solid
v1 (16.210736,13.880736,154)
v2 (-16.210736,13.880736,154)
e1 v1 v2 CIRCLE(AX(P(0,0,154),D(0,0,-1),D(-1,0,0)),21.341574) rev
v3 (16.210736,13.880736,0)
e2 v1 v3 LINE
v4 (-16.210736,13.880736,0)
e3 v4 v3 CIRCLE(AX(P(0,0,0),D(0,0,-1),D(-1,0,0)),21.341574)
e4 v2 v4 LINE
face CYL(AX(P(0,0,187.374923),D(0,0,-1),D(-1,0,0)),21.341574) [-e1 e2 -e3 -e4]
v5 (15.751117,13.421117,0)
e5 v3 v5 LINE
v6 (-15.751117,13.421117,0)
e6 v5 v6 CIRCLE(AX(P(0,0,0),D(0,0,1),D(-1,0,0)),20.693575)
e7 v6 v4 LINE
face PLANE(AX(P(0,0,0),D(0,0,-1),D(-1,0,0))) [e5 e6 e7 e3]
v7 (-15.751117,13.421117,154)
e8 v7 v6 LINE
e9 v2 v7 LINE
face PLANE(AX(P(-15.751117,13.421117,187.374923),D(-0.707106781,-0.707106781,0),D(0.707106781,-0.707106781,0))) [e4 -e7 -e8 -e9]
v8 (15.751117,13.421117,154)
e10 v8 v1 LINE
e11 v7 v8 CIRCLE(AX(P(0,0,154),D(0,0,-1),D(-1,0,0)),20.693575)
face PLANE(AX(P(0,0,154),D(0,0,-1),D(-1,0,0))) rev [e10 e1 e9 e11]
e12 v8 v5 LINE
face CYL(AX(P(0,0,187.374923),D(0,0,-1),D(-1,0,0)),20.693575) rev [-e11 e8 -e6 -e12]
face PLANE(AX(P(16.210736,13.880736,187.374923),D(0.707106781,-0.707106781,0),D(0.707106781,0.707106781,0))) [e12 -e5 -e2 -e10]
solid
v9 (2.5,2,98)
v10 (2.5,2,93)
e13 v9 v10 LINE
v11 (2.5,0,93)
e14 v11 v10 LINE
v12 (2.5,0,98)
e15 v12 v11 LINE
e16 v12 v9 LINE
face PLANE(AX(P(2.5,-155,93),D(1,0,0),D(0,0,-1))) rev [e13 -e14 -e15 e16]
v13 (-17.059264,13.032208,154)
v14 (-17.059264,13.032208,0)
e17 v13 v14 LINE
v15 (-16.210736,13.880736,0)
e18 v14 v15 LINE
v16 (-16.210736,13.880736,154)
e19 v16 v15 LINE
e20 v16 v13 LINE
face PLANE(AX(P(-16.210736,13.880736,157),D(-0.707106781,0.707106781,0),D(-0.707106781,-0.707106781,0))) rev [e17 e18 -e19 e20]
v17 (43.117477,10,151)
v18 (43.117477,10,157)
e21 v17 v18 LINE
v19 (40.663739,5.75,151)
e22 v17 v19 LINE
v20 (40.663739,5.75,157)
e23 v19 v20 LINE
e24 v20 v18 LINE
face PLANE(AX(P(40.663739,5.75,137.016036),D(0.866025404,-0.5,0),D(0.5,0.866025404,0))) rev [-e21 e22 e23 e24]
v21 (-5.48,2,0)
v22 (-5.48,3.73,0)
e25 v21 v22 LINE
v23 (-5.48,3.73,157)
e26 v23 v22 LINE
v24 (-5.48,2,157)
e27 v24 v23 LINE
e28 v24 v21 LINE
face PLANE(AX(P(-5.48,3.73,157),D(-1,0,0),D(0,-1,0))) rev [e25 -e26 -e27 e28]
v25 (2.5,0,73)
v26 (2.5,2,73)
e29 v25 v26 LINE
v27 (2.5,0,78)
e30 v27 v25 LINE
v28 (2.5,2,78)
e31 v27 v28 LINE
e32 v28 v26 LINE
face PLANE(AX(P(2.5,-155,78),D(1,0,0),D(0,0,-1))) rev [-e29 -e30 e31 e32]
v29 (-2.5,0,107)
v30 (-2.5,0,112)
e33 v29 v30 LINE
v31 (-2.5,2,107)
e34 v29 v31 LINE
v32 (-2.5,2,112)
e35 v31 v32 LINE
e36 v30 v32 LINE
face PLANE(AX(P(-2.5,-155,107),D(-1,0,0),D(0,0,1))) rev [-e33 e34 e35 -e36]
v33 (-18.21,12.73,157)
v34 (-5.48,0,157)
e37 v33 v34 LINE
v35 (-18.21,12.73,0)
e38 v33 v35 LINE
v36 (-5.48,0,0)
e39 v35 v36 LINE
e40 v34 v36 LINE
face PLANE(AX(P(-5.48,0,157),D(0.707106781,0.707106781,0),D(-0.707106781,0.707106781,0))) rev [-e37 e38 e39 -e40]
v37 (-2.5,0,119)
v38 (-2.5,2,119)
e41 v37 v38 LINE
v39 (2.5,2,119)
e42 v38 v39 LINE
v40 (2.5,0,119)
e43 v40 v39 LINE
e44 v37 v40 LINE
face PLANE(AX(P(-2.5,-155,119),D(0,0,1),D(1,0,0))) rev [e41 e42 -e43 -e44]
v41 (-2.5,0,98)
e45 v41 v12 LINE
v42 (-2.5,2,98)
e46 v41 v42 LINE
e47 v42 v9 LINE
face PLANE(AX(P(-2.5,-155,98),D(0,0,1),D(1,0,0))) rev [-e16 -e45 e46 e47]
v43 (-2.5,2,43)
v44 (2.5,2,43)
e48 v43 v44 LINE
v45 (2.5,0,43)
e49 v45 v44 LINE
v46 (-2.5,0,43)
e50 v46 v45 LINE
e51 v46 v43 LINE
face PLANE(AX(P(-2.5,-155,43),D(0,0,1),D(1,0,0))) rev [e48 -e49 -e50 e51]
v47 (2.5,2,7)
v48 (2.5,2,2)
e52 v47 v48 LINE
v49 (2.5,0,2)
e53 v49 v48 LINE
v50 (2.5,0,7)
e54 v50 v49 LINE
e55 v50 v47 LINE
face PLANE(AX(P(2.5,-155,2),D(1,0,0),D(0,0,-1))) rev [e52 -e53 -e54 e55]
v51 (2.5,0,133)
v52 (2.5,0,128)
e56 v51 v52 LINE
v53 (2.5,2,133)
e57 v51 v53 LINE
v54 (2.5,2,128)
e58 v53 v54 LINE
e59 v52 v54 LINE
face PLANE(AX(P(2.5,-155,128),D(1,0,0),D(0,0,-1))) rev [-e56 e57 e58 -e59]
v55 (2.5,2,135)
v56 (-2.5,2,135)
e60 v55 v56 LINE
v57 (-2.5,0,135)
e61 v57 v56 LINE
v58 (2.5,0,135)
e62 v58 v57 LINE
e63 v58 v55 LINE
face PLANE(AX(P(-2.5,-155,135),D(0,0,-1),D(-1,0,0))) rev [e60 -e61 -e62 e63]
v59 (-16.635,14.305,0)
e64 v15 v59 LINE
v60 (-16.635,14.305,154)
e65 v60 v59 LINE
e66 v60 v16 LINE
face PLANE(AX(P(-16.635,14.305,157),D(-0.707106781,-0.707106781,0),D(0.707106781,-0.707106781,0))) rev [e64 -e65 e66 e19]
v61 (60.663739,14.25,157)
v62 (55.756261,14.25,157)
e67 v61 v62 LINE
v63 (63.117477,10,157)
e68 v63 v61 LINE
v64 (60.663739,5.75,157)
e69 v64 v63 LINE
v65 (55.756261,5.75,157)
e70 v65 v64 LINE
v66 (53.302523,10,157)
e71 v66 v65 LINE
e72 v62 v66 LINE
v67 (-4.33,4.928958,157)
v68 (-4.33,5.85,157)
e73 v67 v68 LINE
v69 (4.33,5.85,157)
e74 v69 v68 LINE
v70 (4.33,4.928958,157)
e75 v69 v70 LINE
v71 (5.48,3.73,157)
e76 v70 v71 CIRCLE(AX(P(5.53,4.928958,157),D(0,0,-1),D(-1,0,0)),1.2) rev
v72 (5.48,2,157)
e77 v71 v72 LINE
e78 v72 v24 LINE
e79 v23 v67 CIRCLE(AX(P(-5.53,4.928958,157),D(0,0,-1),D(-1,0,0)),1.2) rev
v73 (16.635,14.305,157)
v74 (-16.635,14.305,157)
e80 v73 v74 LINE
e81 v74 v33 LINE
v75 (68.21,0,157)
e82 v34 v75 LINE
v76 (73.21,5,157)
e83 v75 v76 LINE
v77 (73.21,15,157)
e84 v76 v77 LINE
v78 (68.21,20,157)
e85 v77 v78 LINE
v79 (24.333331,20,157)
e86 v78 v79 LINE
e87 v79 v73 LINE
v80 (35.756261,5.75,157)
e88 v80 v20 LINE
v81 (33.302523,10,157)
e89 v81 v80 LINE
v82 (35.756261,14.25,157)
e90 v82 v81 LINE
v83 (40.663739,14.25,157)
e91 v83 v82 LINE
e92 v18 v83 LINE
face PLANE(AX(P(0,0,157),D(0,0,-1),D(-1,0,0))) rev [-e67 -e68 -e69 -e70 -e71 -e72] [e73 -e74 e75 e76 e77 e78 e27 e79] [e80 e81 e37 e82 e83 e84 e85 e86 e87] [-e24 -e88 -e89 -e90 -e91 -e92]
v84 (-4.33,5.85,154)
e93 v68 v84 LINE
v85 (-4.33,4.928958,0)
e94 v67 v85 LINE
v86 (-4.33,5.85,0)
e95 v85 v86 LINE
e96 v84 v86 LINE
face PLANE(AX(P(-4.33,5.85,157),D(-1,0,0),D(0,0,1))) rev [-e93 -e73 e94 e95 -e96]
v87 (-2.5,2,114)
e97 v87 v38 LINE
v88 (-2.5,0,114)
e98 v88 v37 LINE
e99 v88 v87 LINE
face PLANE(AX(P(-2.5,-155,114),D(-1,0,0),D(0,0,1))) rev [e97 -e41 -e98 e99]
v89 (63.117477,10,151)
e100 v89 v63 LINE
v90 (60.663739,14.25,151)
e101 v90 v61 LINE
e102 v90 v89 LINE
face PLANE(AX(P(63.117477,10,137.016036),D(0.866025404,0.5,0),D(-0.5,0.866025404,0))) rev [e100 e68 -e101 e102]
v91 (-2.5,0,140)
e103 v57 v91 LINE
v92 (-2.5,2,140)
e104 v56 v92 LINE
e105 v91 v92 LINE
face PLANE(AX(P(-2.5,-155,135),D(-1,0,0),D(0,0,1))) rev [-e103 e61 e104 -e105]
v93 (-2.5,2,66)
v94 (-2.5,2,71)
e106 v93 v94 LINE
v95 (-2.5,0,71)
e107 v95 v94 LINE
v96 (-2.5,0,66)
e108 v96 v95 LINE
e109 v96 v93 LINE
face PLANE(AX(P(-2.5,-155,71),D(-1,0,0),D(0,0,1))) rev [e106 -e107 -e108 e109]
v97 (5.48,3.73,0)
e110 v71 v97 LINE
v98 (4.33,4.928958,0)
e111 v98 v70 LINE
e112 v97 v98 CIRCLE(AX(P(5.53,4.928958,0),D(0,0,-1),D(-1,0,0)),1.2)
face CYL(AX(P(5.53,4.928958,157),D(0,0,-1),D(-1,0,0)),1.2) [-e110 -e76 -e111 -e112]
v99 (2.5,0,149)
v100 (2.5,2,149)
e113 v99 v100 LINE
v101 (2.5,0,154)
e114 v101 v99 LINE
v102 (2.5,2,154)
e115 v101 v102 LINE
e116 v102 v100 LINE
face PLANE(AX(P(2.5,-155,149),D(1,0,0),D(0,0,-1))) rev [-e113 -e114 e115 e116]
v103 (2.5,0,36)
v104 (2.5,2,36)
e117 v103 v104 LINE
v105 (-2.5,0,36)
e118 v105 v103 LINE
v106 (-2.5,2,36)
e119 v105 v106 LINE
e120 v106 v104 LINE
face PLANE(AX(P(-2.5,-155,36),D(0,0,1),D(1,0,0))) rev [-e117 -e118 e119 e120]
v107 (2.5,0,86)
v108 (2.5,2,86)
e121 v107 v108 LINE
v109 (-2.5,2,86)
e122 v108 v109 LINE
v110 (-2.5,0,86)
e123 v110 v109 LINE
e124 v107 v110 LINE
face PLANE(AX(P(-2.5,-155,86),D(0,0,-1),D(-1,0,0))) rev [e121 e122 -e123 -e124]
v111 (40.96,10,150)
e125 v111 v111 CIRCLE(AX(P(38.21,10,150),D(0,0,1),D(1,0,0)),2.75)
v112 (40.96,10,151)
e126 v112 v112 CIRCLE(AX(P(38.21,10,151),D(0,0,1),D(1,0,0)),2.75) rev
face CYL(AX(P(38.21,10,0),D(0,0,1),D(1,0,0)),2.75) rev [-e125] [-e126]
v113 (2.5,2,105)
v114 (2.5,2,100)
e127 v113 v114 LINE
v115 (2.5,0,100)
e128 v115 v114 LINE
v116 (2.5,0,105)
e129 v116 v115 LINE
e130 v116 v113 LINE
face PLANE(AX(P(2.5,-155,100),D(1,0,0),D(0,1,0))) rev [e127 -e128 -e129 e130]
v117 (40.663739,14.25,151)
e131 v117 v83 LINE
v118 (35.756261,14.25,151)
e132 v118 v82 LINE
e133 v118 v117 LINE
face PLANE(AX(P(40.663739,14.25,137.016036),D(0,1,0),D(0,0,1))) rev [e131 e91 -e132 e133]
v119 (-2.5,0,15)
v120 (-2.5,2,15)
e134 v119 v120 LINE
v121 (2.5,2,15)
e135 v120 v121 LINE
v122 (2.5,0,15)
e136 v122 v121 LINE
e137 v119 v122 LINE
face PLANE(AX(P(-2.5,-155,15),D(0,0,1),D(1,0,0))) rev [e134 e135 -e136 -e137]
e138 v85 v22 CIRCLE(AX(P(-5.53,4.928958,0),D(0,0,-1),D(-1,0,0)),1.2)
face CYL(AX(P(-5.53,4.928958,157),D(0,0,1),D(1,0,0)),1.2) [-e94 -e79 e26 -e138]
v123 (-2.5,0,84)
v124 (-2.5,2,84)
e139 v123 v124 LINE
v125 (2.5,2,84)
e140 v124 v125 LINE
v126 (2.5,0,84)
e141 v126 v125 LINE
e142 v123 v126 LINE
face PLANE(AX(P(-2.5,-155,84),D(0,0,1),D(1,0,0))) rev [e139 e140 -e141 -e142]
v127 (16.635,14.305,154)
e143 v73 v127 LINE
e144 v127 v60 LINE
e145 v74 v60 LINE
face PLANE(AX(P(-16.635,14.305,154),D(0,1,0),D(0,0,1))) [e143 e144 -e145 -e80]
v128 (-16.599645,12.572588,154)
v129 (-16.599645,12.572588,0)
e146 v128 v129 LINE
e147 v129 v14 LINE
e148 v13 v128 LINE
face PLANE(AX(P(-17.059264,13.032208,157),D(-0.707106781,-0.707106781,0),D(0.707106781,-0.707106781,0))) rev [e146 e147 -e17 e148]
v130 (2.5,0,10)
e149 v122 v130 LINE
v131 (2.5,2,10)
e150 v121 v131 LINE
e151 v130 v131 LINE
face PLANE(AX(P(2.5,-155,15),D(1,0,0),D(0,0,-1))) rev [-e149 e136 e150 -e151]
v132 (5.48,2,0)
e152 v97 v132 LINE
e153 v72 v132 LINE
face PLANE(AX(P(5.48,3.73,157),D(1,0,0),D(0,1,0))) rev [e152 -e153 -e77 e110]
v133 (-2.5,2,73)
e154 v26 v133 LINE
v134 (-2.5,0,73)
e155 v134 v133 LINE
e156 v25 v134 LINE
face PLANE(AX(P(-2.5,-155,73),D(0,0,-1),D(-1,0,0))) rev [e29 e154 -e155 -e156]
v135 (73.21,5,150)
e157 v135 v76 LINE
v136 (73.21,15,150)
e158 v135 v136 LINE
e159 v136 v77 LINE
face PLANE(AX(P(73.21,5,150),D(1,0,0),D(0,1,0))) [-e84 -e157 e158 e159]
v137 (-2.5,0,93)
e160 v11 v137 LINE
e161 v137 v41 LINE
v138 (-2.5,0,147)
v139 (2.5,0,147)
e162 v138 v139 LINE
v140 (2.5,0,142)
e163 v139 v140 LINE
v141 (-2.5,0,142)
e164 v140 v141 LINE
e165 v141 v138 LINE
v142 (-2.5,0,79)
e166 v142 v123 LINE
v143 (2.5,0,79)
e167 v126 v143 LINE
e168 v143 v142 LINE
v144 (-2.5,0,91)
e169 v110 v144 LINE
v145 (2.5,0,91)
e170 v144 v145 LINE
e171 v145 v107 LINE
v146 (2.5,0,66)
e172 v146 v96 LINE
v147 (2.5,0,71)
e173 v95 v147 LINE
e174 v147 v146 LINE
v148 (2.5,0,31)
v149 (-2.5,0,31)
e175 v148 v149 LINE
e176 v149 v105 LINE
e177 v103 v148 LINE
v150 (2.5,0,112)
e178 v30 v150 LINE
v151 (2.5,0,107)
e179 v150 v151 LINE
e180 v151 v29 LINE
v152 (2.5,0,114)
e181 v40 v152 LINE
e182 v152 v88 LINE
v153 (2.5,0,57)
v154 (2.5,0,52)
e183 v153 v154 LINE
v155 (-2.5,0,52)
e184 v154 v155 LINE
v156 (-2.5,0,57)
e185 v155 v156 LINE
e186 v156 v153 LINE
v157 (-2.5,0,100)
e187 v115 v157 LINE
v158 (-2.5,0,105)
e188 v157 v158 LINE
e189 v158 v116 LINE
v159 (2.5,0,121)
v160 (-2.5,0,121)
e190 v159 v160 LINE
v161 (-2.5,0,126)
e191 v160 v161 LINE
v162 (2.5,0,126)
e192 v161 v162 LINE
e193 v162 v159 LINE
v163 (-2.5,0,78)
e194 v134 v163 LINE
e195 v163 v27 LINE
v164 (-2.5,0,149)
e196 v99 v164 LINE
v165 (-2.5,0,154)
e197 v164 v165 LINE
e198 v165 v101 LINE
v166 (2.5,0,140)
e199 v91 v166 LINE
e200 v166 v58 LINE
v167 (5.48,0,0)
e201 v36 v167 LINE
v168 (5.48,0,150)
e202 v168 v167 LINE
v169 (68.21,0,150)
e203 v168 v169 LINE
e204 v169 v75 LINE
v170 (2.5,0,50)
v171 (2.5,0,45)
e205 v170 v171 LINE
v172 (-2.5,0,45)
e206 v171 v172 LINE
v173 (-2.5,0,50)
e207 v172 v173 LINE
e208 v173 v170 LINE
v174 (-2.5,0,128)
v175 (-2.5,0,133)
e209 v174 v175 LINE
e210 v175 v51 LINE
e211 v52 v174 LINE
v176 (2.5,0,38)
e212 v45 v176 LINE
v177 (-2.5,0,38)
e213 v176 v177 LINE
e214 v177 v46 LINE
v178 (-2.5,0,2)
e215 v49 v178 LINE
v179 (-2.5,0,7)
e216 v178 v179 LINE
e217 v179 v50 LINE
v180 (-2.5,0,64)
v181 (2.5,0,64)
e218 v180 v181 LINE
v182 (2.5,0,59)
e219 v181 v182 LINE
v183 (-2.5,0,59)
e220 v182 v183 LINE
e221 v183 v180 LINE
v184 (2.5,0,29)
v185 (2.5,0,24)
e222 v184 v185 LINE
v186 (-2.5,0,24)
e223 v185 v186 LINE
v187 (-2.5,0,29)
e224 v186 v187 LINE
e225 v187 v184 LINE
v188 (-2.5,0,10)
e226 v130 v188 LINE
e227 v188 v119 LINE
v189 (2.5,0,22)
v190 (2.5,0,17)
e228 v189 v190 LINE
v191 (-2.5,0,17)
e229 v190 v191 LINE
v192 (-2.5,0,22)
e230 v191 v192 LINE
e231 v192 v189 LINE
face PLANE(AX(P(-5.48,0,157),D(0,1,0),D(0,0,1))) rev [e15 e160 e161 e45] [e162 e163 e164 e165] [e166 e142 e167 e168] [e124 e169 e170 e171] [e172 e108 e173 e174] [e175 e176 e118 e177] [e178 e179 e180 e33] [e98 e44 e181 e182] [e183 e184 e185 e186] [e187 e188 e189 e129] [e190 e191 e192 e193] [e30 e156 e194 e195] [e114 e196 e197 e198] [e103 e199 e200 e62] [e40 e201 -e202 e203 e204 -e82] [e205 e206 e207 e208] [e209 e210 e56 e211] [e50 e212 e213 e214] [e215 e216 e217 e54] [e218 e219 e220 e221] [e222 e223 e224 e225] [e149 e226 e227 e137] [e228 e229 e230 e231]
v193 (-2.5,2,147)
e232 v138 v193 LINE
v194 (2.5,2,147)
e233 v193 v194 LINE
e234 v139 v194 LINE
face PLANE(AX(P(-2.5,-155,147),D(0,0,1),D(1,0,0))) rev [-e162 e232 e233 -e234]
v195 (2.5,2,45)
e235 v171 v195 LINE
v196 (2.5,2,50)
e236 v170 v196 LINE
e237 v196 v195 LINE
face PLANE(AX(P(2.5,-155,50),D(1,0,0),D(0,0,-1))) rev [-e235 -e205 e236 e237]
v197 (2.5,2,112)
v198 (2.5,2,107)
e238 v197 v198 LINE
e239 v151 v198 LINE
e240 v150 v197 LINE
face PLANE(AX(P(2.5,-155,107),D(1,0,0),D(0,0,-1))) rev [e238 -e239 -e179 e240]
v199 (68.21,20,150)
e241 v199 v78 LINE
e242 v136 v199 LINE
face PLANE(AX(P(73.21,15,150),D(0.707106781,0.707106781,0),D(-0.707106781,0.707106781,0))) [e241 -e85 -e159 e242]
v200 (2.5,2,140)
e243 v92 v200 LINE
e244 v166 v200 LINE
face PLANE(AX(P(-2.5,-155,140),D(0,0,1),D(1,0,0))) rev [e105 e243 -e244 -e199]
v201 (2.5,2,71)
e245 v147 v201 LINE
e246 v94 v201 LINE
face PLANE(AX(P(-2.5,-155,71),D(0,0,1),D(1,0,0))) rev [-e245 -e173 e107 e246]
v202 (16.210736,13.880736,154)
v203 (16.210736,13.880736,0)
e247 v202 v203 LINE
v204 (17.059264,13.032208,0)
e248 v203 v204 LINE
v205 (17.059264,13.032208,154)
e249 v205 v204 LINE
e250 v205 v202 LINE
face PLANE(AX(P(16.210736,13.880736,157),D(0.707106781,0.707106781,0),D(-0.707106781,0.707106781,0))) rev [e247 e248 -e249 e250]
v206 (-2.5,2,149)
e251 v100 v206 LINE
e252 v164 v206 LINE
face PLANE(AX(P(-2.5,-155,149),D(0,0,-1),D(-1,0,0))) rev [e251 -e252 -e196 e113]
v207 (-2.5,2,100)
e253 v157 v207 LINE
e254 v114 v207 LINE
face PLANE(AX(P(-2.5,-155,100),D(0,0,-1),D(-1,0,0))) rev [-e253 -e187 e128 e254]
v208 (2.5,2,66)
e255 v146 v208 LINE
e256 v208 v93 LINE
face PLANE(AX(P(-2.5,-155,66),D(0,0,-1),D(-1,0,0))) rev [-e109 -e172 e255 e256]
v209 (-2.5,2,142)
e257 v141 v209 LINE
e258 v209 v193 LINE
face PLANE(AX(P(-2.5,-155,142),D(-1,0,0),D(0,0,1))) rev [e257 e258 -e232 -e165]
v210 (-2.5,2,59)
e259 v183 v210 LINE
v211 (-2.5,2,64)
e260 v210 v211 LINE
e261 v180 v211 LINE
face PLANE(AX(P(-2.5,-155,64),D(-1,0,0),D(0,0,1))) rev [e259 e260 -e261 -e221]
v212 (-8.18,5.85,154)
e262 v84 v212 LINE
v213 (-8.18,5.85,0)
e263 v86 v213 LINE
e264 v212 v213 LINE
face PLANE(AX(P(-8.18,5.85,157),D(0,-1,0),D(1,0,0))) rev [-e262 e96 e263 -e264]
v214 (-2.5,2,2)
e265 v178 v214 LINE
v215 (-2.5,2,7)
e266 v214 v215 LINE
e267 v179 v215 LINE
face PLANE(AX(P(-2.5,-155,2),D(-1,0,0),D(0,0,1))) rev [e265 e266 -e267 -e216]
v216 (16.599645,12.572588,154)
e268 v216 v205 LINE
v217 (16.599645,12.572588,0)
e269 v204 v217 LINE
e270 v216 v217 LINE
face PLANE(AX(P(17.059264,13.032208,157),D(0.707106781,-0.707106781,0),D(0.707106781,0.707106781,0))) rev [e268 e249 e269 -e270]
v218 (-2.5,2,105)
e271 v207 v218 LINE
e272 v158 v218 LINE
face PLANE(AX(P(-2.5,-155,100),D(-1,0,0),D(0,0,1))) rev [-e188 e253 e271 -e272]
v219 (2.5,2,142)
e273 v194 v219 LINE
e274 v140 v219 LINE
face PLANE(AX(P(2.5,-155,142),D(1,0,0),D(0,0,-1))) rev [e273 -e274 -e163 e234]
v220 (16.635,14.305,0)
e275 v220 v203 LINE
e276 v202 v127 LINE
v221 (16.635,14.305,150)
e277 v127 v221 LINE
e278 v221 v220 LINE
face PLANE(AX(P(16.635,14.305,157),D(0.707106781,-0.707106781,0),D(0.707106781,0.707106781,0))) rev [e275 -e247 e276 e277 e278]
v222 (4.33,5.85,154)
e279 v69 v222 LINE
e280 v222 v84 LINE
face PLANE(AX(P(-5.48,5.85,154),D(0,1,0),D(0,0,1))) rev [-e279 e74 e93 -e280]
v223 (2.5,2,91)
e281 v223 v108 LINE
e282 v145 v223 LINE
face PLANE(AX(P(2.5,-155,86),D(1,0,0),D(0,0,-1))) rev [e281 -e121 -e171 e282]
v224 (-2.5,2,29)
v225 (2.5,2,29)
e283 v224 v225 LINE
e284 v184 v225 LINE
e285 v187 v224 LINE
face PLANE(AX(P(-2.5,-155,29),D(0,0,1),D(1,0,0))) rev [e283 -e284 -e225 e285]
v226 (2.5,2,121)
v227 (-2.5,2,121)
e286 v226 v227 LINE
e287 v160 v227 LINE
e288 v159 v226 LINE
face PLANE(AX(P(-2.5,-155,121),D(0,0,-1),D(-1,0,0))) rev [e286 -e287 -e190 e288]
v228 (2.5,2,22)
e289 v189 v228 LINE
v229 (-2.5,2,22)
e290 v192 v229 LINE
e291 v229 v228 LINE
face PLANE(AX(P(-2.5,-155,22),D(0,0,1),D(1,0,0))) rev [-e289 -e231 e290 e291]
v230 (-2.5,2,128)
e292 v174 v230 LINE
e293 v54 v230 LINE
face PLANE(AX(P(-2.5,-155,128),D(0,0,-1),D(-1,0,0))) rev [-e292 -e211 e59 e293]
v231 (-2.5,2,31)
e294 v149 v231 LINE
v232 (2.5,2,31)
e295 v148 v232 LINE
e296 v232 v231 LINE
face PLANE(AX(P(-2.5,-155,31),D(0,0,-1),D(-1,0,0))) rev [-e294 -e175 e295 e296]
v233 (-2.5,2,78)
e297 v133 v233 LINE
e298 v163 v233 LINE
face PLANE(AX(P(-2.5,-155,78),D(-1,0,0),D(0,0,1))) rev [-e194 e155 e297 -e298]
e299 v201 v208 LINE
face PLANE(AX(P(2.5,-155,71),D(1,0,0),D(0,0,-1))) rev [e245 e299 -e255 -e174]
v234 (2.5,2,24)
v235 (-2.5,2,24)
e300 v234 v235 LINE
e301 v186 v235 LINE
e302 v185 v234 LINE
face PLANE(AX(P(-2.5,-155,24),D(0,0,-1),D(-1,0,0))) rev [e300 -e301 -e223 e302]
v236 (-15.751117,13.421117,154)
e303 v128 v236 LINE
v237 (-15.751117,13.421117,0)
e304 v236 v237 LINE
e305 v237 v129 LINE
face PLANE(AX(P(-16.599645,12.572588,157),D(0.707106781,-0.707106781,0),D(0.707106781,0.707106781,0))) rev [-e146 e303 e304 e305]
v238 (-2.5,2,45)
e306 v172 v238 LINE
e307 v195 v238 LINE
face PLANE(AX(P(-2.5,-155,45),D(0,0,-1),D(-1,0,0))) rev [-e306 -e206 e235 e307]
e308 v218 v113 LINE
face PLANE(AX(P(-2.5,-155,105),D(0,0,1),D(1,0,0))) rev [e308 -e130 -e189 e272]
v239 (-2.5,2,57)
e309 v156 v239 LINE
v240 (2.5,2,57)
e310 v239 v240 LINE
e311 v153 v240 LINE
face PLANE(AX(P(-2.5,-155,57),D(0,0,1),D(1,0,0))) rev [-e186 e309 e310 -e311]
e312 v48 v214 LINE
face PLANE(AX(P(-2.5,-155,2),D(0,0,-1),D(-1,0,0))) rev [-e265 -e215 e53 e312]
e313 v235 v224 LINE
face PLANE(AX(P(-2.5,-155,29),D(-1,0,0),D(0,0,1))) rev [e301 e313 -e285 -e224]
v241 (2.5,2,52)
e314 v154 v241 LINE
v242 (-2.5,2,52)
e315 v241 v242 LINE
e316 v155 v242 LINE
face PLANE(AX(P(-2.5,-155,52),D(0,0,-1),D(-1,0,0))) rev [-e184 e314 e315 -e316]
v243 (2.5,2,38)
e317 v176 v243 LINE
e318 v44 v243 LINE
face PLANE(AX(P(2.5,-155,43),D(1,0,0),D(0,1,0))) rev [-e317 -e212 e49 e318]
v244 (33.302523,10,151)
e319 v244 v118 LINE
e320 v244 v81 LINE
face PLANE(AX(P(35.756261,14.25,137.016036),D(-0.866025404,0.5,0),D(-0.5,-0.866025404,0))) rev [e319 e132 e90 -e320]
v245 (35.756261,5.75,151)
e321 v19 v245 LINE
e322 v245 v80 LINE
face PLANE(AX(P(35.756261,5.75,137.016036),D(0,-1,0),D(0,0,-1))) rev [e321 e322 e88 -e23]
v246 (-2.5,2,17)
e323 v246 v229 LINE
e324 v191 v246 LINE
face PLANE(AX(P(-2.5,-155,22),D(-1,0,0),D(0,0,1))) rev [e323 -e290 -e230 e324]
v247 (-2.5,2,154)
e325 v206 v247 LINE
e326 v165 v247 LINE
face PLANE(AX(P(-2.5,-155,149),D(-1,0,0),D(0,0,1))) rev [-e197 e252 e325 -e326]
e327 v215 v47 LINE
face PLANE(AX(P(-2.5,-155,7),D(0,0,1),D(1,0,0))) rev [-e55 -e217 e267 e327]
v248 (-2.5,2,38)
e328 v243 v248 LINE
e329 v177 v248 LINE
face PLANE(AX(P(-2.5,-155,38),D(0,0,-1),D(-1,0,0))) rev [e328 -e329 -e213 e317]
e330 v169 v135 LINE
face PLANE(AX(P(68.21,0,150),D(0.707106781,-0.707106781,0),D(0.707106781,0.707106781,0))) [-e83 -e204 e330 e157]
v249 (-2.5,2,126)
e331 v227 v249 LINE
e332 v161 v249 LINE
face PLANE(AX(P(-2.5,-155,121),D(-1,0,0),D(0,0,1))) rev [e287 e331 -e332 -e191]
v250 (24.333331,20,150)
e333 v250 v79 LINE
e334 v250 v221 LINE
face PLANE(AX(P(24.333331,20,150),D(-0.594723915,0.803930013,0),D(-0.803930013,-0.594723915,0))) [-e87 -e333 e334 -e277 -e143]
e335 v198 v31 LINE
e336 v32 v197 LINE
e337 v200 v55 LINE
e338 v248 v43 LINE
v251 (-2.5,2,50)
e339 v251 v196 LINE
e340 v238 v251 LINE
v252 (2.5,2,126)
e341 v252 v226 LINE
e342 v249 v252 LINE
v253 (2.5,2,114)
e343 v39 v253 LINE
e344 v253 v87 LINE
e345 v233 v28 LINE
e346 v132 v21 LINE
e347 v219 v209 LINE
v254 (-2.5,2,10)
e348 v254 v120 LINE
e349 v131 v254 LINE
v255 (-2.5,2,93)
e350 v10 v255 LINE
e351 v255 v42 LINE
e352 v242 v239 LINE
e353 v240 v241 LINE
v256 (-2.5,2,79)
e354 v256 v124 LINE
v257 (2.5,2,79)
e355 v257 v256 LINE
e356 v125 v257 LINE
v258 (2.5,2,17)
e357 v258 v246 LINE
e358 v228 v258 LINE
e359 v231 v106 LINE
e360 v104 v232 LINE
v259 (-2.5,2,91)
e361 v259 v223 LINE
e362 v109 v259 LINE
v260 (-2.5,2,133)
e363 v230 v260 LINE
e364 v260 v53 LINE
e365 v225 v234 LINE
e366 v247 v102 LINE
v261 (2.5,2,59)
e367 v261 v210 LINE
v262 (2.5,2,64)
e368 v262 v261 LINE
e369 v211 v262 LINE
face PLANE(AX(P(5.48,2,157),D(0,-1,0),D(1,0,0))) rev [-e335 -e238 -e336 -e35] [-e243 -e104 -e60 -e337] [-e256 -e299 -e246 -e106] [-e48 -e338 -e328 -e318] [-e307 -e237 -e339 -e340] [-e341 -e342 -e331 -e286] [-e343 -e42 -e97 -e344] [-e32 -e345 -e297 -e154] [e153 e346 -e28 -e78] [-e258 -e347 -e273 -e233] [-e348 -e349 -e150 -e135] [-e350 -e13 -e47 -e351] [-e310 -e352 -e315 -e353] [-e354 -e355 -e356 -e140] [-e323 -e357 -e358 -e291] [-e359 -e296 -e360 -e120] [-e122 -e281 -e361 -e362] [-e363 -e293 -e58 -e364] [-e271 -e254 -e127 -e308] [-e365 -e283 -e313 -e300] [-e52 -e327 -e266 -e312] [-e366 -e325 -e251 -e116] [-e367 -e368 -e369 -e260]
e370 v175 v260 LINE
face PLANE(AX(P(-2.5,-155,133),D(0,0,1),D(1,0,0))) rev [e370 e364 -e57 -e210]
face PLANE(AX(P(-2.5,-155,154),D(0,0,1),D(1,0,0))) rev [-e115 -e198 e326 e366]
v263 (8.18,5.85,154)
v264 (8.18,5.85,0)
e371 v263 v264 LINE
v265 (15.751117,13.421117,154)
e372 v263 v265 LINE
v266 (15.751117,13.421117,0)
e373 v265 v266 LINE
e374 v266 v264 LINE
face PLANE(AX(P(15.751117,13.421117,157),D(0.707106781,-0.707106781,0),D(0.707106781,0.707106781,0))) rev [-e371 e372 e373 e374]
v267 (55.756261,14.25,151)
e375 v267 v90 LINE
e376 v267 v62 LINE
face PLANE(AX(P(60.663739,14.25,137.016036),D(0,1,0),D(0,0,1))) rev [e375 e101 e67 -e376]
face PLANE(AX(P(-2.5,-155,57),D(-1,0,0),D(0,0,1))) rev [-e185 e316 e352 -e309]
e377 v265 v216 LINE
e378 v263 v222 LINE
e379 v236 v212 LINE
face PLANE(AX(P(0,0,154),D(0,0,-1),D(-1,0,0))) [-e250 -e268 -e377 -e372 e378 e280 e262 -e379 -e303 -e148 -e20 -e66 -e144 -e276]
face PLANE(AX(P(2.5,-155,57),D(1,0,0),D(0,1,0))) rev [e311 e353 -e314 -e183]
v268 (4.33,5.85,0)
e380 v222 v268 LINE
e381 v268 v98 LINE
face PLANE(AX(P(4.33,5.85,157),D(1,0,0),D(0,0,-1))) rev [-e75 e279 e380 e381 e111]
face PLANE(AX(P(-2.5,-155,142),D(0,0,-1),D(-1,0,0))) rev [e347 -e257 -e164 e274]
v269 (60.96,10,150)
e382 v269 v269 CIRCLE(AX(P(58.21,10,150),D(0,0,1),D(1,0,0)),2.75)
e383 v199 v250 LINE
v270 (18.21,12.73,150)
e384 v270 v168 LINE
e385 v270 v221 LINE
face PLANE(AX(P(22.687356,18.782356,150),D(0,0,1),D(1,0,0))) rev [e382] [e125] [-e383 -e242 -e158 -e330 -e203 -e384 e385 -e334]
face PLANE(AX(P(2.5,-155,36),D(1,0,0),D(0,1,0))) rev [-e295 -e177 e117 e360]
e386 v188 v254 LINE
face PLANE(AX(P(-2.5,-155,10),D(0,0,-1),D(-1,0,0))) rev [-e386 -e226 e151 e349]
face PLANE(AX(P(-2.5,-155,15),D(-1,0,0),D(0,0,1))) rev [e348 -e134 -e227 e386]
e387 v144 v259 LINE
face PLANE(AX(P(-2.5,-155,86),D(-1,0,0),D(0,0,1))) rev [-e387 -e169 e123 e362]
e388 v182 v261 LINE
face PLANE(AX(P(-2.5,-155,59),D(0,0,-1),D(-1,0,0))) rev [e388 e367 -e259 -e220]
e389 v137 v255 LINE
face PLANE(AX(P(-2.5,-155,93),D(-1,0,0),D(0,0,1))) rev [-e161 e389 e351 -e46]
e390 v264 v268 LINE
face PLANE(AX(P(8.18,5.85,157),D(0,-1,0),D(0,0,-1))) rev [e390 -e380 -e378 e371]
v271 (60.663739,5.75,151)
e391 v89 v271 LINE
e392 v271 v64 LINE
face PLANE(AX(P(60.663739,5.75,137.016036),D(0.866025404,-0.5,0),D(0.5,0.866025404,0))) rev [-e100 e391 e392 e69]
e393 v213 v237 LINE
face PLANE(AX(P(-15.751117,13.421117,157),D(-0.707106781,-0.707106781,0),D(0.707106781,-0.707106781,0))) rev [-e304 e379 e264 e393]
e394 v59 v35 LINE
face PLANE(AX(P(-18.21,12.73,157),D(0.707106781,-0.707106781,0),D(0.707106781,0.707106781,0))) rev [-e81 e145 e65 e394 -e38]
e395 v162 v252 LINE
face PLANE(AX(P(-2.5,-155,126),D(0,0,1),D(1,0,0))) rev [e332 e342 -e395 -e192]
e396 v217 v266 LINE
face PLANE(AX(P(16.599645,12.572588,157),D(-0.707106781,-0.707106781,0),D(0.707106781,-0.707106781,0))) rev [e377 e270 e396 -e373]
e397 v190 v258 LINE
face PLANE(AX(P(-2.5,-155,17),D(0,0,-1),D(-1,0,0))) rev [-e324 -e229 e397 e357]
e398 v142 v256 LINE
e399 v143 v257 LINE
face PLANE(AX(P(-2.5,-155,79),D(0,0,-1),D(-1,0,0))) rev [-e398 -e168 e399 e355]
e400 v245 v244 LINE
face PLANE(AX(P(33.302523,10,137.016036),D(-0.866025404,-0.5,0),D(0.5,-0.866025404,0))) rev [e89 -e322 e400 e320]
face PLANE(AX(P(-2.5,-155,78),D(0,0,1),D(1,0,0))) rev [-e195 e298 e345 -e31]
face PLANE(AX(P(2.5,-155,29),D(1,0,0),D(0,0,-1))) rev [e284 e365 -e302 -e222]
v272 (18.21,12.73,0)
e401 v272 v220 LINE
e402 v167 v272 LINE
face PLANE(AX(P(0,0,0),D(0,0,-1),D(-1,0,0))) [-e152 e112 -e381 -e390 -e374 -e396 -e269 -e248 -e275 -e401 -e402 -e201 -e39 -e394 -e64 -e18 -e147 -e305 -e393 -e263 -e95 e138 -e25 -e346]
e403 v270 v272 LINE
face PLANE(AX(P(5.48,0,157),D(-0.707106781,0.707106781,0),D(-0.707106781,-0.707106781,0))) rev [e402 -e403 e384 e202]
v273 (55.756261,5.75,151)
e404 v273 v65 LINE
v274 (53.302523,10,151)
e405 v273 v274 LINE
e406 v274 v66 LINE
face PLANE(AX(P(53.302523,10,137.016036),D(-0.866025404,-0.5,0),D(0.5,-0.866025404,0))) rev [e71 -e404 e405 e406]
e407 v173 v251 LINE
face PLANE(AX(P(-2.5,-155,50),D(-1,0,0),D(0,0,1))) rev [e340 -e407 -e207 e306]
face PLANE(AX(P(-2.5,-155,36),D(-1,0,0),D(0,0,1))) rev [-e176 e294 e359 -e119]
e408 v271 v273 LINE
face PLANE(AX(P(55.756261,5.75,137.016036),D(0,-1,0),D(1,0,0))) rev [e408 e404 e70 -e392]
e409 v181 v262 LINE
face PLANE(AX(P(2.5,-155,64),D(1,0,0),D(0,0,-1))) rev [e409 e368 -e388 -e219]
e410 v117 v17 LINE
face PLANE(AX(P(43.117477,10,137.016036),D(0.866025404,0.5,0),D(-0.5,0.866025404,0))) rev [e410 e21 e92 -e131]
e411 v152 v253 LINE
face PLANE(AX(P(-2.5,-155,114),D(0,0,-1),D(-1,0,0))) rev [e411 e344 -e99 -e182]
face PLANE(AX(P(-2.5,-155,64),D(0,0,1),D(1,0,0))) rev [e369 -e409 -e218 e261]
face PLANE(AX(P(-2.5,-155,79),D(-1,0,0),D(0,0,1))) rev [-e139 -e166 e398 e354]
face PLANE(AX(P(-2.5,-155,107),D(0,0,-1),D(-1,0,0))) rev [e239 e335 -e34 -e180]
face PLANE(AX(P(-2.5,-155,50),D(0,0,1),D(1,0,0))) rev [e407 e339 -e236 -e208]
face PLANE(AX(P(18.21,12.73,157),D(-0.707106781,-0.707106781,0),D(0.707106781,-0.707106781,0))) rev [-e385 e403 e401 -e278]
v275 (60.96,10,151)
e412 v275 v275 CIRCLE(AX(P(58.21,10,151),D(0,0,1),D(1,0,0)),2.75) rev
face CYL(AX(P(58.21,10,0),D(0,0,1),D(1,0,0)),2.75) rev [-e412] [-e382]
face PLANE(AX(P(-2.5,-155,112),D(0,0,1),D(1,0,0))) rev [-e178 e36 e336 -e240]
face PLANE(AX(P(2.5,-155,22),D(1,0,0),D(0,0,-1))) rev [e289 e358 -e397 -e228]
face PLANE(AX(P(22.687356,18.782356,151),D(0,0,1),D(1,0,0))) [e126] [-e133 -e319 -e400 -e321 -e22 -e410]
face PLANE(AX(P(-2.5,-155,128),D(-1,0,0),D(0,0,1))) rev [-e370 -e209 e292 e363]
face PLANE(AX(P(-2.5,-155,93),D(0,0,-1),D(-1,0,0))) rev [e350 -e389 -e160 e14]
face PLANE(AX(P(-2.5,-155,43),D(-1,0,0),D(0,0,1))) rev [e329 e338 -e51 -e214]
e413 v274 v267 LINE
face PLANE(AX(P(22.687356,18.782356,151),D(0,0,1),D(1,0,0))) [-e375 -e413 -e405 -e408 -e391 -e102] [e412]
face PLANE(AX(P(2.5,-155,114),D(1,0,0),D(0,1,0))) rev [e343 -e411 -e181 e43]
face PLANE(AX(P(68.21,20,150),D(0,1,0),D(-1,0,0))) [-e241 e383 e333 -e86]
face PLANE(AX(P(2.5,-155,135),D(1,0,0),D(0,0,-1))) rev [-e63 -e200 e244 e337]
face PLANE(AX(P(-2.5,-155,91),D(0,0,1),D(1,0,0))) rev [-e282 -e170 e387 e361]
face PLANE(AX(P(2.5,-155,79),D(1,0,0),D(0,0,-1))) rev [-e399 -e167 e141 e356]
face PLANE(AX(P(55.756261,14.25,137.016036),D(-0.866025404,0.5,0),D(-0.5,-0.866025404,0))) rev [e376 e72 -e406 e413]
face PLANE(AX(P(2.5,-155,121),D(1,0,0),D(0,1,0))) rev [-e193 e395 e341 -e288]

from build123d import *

# Parameters (mm, degrees)
BOSS_EXTRUDE1_DEPTH = 157
SKETCH2_W           = 5
SKETCH2_H           = 5
CUT_EXTRUDE1_DEPTH  = 157
SKETCH3_W           = 5
SKETCH3_H           = 5
CUT_EXTRUDE2_DEPTH  = 157
FILLET1_R           = 1.2
BOSS_EXTRUDE2_DEPTH = 3
BOSS_EXTRUDE3_DEPTH = 7
SKETCH6_R           = 2.75
CUT_EXTRUDE3_DEPTH  = 175.380916674
CUT_EXTRUDE4_DEPTH  = 6
BOSS_EXTRUDE4_DEPTH = 154


with BuildPart() as part:
    # Sketch1 → Boss-Extrude1 (new body)
    with BuildSketch(Plane.XY):
        Polygon((5.48, 0), (18.21, 12.73), (16.635, 14.305), (16.210735931, 13.880735931), (17.059264069, 13.032207794), (16.599644661, 12.572588386), (15.751116524, 13.421116524), (8.18, 5.85), (4.33, 5.85), (4.33, 3.73), (5.48, 3.73), (5.48, 2), (-5.48, 2), (-5.48, 3.73), (-4.33, 3.73), (-4.33, 5.85), (-8.18, 5.85), (-15.751116524, 13.421116524), (-16.599644661, 12.572588386), (-17.059264069, 13.032207794), (-16.210735931, 13.880735931), (-16.635, 14.305), (-18.21, 12.73), (-5.48, 0), align=None)
    extrude(amount=BOSS_EXTRUDE1_DEPTH)

    # Sketch2 → Cut-Extrude1 (cut)
    with BuildSketch(Plane(origin=(0, 2, 0), x_dir=(1, 0, 0), z_dir=(0, 1, 0))):
        with Locations((0, -4.5)):
            Rectangle(SKETCH2_W, SKETCH2_H)
        with Locations((0, -151.5)):
            Rectangle(SKETCH2_W, SKETCH2_H)
    extrude(amount=-CUT_EXTRUDE1_DEPTH, mode=Mode.SUBTRACT)

    # Sketch3 → Cut-Extrude2 (cut)
    with BuildSketch(Plane(origin=(0, 2, 0), x_dir=(1, 0, 0), z_dir=(0, 1, 0))):
        with Locations((0, -144.5)):
            Rectangle(SKETCH3_W, SKETCH3_H)
        with Locations((0, -137.5)):
            Rectangle(SKETCH3_W, SKETCH3_H)
        with Locations((0, -130.5)):
            Rectangle(SKETCH3_W, SKETCH3_H)
        with Locations((0, -88.5)):
            Rectangle(SKETCH3_W, SKETCH3_H)
        with Locations((0, -81.5)):
            Rectangle(SKETCH3_W, SKETCH3_H)
        with Locations((0, -95.5)):
            Rectangle(SKETCH3_W, SKETCH3_H)
        with Locations((0, -102.5)):
            Rectangle(SKETCH3_W, SKETCH3_H)
        with Locations((0, -109.5)):
            Rectangle(SKETCH3_W, SKETCH3_H)
        with Locations((0, -116.5)):
            Rectangle(SKETCH3_W, SKETCH3_H)
        with Locations((0, -123.5)):
            Rectangle(SKETCH3_W, SKETCH3_H)
        with Locations((0, -33.5)):
            Rectangle(SKETCH3_W, SKETCH3_H)
        with Locations((0, -40.5)):
            Rectangle(SKETCH3_W, SKETCH3_H)
        with Locations((0, -47.5)):
            Rectangle(SKETCH3_W, SKETCH3_H)
        with Locations((0, -54.5)):
            Rectangle(SKETCH3_W, SKETCH3_H)
        with Locations((0, -61.5)):
            Rectangle(SKETCH3_W, SKETCH3_H)
        with Locations((0, -75.5)):
            Rectangle(SKETCH3_W, SKETCH3_H)
        with Locations((0, -68.5)):
            Rectangle(SKETCH3_W, SKETCH3_H)
        with Locations((0, -26.5)):
            Rectangle(SKETCH3_W, SKETCH3_H)
        with Locations((0, -19.5)):
            Rectangle(SKETCH3_W, SKETCH3_H)
        with Locations((0, -12.5)):
            Rectangle(SKETCH3_W, SKETCH3_H)
    extrude(amount=-CUT_EXTRUDE2_DEPTH, mode=Mode.SUBTRACT)

    # Fillet1
    # the kernel refuses this fillet: 1.2 mm, written as the material it takes off along each edge
    with BuildSketch(Plane(origin=(4.33, 3.73, -2.997394702), x_dir=(0, 1, 0), z_dir=(0, 0, 1))) as fillet1_piece_1:
        with BuildLine():
            CenterArc((1.198957881, -1.2), FILLET1_R, 90, 87.611984537)
            Line((0, -1.15), (-0.023979158, -1.149))
            ThreePointArc((-0.023979158, -1.149), (-0.024, -0.575), (-0.024, 0))
            Line((-0.024, 0), (0, 0.024))
            Line((0, 0.024), (1.198957881, 0.024))
            Line((1.198957881, 0.024), (1.198957881, 0))
        make_face()
    extrude(amount=162.994789404, mode=Mode.SUBTRACT)
    with BuildSketch(Plane(origin=(-4.33, 3.73, -2.997394702), x_dir=(-1, 0, 0), z_dir=(0, 0, 1))) as fillet1_piece_2:
        with BuildLine():
            CenterArc((1.2, -1.198957881), FILLET1_R, 92.388015463, 87.611984537)
            Line((0, -1.198957881), (-0.024, -1.198957881))
            Line((-0.024, -1.198957881), (-0.024, 0))
            Line((-0.024, 0), (0, 0.024))
            ThreePointArc((0, 0.024), (0.575, 0.024), (1.149, 0.023979158))
            Line((1.149, 0.023979158), (1.15, 0))
        make_face()
    extrude(amount=162.994789404, mode=Mode.SUBTRACT)

    # Sketch4 → Boss-Extrude2 (add)
    with BuildSketch(Plane.XY.offset(157)):
        Polygon((-16.635, 14.305), (16.635, 14.305), (18.21, 12.73), (5.48, 0), (-5.48, 0), (-18.21, 12.73), align=None)
        with BuildLine():
            Line((-5.48, 5.85), (5.48, 5.85))
            ThreePointArc((5.48, 5.85), (7.405, 3.925), (5.48, 2))
            Line((5.48, 2), (-5.48, 2))
            ThreePointArc((-5.48, 2), (-7.405, 3.925), (-5.48, 5.85))
        make_face(mode=Mode.SUBTRACT)
    extrude(amount=-BOSS_EXTRUDE2_DEPTH)

    # Sketch5 → Boss-Extrude3 (add)
    with BuildSketch(Plane.XY.offset(157)):
        with BuildLine():
            Line((23.21, 0), (68.21, 0))
            Line((68.21, 0), (73.21, 5))
            Line((73.21, 5), (73.21, 15))
            Line((73.21, 15), (68.21, 20))
            Line((68.21, 20), (24.333330784, 20))
            Line((24.333330784, 20), (16.635, 14.305))
            ThreePointArc((16.635, 14.305), (17.363929946, 13.458929946), (18.21, 12.73))
            Line((18.21, 12.73), (5.48, 0))
            Line((5.48, 0), (23.21, 0))
        make_face()
    extrude(amount=-BOSS_EXTRUDE3_DEPTH)

    # Sketch6 → Cut-Extrude3 (cut, through all)
    with BuildSketch(Plane.XY.offset(157)):
        with Locations((38.21, 10)):
            Circle(SKETCH6_R)
        with Locations((58.21, 10)):
            Circle(SKETCH6_R)
    extrude(amount=-CUT_EXTRUDE3_DEPTH, mode=Mode.SUBTRACT)

    # Sketch7 → Cut-Extrude4 (cut)
    with BuildSketch(Plane.XY.offset(157)):
        Polygon((43.117477288, 10), (40.663738644, 14.25), (35.756261356, 14.25), (33.302522712, 10), (35.756261356, 5.75), (40.663738644, 5.75), align=None)
        Polygon((63.117477288, 10), (60.663738644, 14.25), (55.756261356, 14.25), (53.302522712, 10), (55.756261356, 5.75), (60.663738644, 5.75), align=None)
    extrude(amount=-CUT_EXTRUDE4_DEPTH, mode=Mode.SUBTRACT)


with BuildPart() as body_2:
    # Sketch8 → Boss-Extrude4 (new body)
    with BuildSketch(Plane(origin=(0, 0, 0), x_dir=(-1, 0, 0), z_dir=(0, 0, -1))):
        with BuildLine():
            Line((15.751116524, 13.421116524), (16.210735931, 13.880735931))
            ThreePointArc((16.210735931, 13.880735931), (0, 21.341574202), (-16.210735931, 13.880735931))
            Line((-16.210735931, 13.880735931), (-15.751116524, 13.421116524))
            ThreePointArc((-15.751116524, 13.421116524), (0, 20.69357486), (15.751116524, 13.421116524))
        make_face()
    extrude(amount=-BOSS_EXTRUDE4_DEPTH)


solid = Compound([part.part, body_2.part])
